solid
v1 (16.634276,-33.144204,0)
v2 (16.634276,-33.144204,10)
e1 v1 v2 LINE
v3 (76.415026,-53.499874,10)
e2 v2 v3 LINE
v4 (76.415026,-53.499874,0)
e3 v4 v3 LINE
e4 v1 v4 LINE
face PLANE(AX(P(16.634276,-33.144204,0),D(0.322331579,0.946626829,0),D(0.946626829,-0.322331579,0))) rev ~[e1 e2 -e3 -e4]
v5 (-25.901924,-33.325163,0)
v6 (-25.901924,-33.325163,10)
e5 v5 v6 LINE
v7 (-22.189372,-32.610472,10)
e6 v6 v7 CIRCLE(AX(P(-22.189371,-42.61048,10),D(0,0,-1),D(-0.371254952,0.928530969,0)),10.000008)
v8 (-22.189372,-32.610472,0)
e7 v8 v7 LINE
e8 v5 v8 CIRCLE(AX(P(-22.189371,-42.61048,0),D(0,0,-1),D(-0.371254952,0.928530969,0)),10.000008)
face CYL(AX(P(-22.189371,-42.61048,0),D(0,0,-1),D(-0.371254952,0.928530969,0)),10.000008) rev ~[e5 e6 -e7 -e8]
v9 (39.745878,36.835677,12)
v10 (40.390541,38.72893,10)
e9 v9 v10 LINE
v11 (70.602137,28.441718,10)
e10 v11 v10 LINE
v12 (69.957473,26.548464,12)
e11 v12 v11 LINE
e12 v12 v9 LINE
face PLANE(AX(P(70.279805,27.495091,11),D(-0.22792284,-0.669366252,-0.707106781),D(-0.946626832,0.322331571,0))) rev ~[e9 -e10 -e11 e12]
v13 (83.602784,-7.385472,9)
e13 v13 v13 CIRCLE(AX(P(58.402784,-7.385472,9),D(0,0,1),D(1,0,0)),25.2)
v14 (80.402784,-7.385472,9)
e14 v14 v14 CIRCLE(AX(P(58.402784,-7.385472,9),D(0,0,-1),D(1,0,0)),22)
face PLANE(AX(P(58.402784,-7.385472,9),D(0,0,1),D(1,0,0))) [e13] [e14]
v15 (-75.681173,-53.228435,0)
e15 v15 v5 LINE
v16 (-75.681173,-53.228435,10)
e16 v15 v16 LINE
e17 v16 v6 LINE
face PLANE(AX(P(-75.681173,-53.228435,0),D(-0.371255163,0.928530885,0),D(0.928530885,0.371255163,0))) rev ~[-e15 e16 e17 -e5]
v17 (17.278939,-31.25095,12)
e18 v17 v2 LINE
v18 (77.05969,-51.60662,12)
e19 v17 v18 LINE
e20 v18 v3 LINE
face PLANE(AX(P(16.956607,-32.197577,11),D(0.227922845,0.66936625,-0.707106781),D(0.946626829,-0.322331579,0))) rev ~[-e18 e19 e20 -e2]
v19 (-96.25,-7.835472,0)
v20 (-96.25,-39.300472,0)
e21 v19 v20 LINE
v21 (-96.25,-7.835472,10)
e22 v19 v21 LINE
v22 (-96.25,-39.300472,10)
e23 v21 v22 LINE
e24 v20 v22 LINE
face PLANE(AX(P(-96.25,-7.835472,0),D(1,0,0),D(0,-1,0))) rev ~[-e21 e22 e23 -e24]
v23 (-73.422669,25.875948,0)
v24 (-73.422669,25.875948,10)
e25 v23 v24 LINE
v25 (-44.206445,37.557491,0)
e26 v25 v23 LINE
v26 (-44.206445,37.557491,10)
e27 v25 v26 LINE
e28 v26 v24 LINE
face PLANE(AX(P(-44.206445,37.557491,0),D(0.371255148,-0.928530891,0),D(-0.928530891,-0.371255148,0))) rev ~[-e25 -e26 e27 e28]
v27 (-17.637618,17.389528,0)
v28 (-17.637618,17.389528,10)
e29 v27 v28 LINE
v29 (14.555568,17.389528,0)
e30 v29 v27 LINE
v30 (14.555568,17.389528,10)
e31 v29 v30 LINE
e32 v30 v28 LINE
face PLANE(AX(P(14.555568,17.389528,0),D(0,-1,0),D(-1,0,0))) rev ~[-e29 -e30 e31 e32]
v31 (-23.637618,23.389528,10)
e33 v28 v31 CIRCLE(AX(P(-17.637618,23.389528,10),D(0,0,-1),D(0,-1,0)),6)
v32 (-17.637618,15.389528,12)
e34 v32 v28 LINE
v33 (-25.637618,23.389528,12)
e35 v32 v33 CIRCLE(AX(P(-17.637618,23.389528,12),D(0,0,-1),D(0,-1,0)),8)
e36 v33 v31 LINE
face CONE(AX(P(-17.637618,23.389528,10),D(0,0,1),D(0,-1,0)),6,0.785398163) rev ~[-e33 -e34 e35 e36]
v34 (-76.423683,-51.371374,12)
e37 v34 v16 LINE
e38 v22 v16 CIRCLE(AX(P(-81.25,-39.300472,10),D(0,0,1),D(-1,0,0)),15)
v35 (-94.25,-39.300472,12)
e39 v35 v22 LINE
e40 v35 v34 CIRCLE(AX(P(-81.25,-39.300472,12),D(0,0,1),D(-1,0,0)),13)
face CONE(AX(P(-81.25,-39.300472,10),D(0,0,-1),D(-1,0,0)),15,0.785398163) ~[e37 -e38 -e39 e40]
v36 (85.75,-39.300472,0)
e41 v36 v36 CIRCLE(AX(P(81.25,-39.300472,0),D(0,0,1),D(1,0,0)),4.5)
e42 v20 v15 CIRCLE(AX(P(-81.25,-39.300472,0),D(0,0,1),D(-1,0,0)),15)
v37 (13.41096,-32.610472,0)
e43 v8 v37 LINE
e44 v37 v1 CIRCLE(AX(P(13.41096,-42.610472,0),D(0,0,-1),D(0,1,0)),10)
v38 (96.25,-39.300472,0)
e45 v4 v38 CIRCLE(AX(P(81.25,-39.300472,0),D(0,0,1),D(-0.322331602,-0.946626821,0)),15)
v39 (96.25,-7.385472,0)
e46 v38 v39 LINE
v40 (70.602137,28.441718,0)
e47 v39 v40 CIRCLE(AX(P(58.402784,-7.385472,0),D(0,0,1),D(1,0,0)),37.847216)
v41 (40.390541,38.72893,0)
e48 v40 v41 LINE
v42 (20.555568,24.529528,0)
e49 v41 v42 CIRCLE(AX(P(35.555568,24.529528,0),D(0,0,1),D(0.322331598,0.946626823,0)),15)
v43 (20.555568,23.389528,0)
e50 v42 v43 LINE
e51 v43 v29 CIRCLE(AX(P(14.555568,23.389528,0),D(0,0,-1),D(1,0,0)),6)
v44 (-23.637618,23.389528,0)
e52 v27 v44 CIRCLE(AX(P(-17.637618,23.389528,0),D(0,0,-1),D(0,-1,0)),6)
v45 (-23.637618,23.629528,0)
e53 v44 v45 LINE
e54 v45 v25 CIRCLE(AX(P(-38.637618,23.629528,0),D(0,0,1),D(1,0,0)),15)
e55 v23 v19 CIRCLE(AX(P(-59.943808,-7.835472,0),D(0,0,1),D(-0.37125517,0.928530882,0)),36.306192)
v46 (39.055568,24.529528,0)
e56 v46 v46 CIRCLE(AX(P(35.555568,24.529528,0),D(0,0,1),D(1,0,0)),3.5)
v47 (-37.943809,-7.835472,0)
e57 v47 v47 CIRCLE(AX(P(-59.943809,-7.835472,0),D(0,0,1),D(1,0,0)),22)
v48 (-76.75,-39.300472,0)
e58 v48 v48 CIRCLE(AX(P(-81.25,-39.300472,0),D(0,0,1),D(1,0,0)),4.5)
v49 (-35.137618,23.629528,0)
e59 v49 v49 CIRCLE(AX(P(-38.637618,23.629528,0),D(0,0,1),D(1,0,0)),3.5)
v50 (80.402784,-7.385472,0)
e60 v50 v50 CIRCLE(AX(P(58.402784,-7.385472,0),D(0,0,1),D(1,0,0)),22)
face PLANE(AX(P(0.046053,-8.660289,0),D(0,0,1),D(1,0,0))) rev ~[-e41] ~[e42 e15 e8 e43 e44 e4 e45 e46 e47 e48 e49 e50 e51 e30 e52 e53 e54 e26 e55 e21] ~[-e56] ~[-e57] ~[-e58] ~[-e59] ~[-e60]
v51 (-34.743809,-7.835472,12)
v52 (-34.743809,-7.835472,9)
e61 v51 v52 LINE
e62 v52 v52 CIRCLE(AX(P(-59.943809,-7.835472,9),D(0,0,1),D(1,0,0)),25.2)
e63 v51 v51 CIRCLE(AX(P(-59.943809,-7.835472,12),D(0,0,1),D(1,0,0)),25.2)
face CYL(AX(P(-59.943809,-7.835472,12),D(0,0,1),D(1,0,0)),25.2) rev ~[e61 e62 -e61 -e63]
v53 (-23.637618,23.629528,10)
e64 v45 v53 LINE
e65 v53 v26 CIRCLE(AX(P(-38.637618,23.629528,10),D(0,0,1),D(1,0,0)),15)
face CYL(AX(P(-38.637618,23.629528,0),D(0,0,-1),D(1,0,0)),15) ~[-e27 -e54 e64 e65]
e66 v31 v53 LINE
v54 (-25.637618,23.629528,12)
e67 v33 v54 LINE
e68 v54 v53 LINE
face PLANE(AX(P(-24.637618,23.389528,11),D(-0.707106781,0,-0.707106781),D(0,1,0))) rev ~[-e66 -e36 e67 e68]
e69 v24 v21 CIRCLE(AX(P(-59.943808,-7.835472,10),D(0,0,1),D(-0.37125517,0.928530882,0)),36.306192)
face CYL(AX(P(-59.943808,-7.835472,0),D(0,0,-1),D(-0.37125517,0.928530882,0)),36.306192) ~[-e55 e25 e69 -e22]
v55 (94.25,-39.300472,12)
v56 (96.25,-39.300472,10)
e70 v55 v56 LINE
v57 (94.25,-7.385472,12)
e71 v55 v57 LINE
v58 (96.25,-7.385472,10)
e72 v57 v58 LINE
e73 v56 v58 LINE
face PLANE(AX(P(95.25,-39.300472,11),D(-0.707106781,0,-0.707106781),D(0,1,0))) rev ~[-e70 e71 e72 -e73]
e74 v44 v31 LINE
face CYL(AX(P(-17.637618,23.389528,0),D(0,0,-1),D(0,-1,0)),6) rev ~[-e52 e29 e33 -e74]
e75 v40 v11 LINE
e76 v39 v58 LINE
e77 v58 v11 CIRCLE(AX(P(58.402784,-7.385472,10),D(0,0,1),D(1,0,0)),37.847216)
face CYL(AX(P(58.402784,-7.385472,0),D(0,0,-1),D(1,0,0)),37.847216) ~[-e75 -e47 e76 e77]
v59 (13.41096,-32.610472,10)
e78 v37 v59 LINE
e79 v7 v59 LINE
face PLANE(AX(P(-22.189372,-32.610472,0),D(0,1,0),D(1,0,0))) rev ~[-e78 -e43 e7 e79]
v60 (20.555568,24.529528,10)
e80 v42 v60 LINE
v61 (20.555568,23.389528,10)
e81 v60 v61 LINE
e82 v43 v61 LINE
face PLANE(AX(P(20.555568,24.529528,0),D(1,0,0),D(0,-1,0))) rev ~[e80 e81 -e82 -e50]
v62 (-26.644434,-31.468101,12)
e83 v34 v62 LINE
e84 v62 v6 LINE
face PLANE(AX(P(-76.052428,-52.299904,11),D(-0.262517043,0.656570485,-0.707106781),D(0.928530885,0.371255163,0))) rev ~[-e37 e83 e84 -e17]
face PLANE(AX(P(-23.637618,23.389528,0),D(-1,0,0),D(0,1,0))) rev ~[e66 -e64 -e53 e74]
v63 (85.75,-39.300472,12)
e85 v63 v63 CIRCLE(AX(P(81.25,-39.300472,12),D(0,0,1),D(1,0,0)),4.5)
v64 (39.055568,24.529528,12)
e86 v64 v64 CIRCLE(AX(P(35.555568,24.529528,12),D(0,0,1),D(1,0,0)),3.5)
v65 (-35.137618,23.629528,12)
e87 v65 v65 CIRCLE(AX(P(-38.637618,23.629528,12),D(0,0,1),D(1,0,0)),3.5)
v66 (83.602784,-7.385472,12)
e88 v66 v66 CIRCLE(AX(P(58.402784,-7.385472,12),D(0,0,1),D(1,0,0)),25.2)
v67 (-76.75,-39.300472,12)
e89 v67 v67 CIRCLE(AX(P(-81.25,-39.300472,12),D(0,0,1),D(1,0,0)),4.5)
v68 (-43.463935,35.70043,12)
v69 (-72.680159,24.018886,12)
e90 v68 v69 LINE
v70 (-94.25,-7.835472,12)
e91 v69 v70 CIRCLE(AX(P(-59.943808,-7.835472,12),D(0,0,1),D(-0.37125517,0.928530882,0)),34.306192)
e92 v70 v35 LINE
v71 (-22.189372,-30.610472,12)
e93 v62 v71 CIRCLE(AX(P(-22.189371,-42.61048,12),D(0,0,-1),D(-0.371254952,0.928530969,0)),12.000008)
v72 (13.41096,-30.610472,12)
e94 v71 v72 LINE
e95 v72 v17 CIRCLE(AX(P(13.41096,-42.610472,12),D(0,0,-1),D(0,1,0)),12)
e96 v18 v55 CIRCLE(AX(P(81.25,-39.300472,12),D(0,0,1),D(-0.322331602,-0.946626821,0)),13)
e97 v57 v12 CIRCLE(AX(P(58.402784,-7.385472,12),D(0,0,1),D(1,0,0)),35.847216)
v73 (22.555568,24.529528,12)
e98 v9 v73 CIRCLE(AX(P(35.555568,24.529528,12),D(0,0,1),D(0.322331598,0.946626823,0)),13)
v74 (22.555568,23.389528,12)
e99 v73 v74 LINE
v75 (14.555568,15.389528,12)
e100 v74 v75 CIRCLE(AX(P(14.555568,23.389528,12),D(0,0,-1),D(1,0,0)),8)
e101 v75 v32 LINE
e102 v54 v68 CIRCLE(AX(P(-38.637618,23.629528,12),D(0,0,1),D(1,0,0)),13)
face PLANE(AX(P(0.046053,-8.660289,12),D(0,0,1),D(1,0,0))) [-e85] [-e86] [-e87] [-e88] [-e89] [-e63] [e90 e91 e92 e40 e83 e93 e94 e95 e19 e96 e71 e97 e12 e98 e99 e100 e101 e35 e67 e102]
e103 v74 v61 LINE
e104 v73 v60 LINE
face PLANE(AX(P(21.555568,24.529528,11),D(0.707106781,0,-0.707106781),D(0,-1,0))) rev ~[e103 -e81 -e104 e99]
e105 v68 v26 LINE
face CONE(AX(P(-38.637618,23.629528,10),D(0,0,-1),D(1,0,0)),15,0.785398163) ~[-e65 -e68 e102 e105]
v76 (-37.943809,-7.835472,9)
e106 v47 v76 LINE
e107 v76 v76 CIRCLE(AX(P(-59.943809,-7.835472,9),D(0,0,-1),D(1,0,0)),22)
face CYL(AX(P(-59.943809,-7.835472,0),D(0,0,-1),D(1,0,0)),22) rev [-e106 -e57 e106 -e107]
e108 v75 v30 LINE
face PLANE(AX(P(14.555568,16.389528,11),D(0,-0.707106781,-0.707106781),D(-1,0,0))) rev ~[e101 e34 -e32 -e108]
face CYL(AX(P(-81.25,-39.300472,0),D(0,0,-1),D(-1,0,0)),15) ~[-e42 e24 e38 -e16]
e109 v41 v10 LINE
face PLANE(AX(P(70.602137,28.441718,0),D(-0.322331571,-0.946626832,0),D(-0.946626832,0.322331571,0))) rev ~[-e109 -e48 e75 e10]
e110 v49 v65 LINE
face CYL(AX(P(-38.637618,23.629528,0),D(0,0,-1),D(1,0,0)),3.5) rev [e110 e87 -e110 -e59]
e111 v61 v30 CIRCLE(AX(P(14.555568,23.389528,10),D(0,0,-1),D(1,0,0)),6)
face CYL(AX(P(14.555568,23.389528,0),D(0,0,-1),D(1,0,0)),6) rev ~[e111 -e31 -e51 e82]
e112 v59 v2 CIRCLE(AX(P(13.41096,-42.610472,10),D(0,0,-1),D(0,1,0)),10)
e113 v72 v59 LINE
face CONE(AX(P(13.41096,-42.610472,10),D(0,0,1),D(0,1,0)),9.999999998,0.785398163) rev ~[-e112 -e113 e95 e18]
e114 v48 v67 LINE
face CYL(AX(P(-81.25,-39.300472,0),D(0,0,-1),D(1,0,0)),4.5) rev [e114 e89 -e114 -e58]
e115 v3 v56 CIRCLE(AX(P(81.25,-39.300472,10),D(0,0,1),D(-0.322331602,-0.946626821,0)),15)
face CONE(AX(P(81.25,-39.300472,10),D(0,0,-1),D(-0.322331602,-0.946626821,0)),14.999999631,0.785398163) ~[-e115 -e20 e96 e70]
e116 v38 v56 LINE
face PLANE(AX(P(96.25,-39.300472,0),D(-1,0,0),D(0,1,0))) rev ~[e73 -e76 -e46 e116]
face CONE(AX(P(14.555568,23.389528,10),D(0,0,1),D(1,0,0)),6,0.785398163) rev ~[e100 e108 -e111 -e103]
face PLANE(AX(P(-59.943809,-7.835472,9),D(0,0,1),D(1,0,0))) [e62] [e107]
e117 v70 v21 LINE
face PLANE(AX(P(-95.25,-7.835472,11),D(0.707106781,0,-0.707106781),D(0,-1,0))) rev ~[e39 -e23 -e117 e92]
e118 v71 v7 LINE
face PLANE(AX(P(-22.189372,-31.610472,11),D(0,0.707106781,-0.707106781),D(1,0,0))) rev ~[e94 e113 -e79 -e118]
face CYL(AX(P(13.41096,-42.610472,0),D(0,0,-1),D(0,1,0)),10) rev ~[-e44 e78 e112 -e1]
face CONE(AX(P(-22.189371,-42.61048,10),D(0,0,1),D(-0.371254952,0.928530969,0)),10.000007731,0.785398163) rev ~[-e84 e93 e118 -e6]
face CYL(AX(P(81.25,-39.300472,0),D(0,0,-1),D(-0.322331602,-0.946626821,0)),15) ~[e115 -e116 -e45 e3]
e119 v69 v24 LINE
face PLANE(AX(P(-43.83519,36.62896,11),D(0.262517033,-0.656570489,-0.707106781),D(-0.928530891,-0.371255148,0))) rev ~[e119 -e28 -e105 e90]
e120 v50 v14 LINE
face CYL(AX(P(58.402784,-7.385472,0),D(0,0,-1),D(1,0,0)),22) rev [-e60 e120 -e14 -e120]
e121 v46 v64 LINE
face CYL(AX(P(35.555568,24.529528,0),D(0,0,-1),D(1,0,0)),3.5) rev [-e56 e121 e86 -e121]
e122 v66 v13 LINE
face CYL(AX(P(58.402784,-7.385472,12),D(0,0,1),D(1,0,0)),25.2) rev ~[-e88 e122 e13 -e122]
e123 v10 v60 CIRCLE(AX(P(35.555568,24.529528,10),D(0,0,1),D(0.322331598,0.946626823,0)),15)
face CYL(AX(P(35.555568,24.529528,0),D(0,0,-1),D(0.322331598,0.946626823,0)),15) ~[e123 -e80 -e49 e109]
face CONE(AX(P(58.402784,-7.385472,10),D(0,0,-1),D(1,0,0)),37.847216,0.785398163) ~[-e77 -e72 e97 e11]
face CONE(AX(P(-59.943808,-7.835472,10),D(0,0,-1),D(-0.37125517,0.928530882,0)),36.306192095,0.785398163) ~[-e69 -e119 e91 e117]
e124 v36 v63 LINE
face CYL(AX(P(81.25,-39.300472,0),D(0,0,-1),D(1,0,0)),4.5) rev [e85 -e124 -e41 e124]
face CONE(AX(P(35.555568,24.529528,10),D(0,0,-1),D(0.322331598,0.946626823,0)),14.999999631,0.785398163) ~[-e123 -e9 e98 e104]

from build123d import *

# Parameters (mm, degrees)
F0_R     = 4.5
F0_R_2   = 22
F0_R_3   = 3.5
F1_DEPTH = 12
F2_R     = 25.2
F3_DEPTH = 3
F4_SIZE  = 2


# Not quite as in the source:
# - ends of sketch curves that miss each other by under 0.0002 mm in the source are joined


with BuildPart() as f1:
    # F0 (on Top) → F1 (new body)
    with BuildSketch(Plane.XY):
        with BuildLine():
            Line((-96.25, -7.835472), (-96.25, -39.300472))
            ThreePointArc((-96.25, -39.300472), (-89.6603385796, -51.720866719), (-75.6811726698, -53.2284353172))
            Line((-75.6811726698, -53.2284353172), (-25.901923657, -33.3251628629))
            ThreePointArc((-25.901923657, -33.3251628629), (-24.0797305928, -32.7907701516), (-22.189372, -32.610472))
            Line((-22.189372, -32.610472), (13.41096, -32.610472))
            ThreePointArc((13.41096, -32.610472), (15.0445629213, -32.7448072228), (16.6342757601, -33.1442037009))
            Line((16.6342757601, -33.1442037009), (76.4150264593, -53.4998741564))
            ThreePointArc((76.4150264593, -53.4998741564), (89.9814201421, -51.4972872524), (96.25, -39.300472))
            Line((96.25, -39.300472), (96.25, -7.385472))
            ThreePointArc((96.25, -7.385472), (89.1771507076, 14.6451910108), (70.602136617, 28.4417181588))
            Line((70.602136617, 28.4417181588), (40.3905414757, 38.7289301785))
            ThreePointArc((40.3905414757, 38.7289301785), (26.82414783, 36.7263432324), (20.555568, 24.529528))
            Line((20.555568, 24.529528), (20.555568, 23.389528))
            ThreePointArc((20.555568, 23.389528), (18.7982086871, 19.1468873129), (14.555568, 17.389528))
            Line((14.555568, 17.389528), (-17.637618, 17.389528))
            ThreePointArc((-17.637618, 17.389528), (-21.8802586871, 19.1468873129), (-23.637618, 23.389528))
            Line((-23.637618, 23.389528), (-23.637618, 23.629528))
            ThreePointArc((-23.637618, 23.629528), (-30.2272793638, 36.0499226807), (-44.2064452032, 37.557491368))
            Line((-44.2064452032, 37.557491368), (-73.4226694122, 25.875948235))
            ThreePointArc((-73.4226694122, 25.875948235), (-90.0062904382, 12.5210187268), (-96.25, -7.835472))
        make_face()
        with Locations((-81.25, -39.300472)):
            Circle(F0_R, mode=Mode.SUBTRACT)
        with Locations((-59.943809, -7.835472)):
            Circle(F0_R_2, mode=Mode.SUBTRACT)
        with Locations((81.25, -39.300472)):
            Circle(F0_R, mode=Mode.SUBTRACT)
        with Locations((-38.637618, 23.629528)):
            Circle(F0_R_3, mode=Mode.SUBTRACT)
        with Locations((58.402784, -7.385472)):
            Circle(F0_R_2, mode=Mode.SUBTRACT)
        with Locations((35.555568, 24.529528)):
            Circle(F0_R_3, mode=Mode.SUBTRACT)
    extrude(amount=F1_DEPTH)

    # F2 (on face) → F3 (cut)
    with BuildSketch(Plane.XY.offset(12)):
        with Locations((-59.943809, -7.835472)):
            Circle(F2_R)
        with Locations((58.402784, -7.385472)):
            Circle(F2_R)
    extrude(amount=-F3_DEPTH, mode=Mode.SUBTRACT)

    # F4
    f4_edges = [f1.edges().sort_by_distance(p)[0] for p in [
        (-58.814557, 31.71672, 12),
    ]]
    chamfer(f4_edges, length=F4_SIZE)


solid = f1.part
